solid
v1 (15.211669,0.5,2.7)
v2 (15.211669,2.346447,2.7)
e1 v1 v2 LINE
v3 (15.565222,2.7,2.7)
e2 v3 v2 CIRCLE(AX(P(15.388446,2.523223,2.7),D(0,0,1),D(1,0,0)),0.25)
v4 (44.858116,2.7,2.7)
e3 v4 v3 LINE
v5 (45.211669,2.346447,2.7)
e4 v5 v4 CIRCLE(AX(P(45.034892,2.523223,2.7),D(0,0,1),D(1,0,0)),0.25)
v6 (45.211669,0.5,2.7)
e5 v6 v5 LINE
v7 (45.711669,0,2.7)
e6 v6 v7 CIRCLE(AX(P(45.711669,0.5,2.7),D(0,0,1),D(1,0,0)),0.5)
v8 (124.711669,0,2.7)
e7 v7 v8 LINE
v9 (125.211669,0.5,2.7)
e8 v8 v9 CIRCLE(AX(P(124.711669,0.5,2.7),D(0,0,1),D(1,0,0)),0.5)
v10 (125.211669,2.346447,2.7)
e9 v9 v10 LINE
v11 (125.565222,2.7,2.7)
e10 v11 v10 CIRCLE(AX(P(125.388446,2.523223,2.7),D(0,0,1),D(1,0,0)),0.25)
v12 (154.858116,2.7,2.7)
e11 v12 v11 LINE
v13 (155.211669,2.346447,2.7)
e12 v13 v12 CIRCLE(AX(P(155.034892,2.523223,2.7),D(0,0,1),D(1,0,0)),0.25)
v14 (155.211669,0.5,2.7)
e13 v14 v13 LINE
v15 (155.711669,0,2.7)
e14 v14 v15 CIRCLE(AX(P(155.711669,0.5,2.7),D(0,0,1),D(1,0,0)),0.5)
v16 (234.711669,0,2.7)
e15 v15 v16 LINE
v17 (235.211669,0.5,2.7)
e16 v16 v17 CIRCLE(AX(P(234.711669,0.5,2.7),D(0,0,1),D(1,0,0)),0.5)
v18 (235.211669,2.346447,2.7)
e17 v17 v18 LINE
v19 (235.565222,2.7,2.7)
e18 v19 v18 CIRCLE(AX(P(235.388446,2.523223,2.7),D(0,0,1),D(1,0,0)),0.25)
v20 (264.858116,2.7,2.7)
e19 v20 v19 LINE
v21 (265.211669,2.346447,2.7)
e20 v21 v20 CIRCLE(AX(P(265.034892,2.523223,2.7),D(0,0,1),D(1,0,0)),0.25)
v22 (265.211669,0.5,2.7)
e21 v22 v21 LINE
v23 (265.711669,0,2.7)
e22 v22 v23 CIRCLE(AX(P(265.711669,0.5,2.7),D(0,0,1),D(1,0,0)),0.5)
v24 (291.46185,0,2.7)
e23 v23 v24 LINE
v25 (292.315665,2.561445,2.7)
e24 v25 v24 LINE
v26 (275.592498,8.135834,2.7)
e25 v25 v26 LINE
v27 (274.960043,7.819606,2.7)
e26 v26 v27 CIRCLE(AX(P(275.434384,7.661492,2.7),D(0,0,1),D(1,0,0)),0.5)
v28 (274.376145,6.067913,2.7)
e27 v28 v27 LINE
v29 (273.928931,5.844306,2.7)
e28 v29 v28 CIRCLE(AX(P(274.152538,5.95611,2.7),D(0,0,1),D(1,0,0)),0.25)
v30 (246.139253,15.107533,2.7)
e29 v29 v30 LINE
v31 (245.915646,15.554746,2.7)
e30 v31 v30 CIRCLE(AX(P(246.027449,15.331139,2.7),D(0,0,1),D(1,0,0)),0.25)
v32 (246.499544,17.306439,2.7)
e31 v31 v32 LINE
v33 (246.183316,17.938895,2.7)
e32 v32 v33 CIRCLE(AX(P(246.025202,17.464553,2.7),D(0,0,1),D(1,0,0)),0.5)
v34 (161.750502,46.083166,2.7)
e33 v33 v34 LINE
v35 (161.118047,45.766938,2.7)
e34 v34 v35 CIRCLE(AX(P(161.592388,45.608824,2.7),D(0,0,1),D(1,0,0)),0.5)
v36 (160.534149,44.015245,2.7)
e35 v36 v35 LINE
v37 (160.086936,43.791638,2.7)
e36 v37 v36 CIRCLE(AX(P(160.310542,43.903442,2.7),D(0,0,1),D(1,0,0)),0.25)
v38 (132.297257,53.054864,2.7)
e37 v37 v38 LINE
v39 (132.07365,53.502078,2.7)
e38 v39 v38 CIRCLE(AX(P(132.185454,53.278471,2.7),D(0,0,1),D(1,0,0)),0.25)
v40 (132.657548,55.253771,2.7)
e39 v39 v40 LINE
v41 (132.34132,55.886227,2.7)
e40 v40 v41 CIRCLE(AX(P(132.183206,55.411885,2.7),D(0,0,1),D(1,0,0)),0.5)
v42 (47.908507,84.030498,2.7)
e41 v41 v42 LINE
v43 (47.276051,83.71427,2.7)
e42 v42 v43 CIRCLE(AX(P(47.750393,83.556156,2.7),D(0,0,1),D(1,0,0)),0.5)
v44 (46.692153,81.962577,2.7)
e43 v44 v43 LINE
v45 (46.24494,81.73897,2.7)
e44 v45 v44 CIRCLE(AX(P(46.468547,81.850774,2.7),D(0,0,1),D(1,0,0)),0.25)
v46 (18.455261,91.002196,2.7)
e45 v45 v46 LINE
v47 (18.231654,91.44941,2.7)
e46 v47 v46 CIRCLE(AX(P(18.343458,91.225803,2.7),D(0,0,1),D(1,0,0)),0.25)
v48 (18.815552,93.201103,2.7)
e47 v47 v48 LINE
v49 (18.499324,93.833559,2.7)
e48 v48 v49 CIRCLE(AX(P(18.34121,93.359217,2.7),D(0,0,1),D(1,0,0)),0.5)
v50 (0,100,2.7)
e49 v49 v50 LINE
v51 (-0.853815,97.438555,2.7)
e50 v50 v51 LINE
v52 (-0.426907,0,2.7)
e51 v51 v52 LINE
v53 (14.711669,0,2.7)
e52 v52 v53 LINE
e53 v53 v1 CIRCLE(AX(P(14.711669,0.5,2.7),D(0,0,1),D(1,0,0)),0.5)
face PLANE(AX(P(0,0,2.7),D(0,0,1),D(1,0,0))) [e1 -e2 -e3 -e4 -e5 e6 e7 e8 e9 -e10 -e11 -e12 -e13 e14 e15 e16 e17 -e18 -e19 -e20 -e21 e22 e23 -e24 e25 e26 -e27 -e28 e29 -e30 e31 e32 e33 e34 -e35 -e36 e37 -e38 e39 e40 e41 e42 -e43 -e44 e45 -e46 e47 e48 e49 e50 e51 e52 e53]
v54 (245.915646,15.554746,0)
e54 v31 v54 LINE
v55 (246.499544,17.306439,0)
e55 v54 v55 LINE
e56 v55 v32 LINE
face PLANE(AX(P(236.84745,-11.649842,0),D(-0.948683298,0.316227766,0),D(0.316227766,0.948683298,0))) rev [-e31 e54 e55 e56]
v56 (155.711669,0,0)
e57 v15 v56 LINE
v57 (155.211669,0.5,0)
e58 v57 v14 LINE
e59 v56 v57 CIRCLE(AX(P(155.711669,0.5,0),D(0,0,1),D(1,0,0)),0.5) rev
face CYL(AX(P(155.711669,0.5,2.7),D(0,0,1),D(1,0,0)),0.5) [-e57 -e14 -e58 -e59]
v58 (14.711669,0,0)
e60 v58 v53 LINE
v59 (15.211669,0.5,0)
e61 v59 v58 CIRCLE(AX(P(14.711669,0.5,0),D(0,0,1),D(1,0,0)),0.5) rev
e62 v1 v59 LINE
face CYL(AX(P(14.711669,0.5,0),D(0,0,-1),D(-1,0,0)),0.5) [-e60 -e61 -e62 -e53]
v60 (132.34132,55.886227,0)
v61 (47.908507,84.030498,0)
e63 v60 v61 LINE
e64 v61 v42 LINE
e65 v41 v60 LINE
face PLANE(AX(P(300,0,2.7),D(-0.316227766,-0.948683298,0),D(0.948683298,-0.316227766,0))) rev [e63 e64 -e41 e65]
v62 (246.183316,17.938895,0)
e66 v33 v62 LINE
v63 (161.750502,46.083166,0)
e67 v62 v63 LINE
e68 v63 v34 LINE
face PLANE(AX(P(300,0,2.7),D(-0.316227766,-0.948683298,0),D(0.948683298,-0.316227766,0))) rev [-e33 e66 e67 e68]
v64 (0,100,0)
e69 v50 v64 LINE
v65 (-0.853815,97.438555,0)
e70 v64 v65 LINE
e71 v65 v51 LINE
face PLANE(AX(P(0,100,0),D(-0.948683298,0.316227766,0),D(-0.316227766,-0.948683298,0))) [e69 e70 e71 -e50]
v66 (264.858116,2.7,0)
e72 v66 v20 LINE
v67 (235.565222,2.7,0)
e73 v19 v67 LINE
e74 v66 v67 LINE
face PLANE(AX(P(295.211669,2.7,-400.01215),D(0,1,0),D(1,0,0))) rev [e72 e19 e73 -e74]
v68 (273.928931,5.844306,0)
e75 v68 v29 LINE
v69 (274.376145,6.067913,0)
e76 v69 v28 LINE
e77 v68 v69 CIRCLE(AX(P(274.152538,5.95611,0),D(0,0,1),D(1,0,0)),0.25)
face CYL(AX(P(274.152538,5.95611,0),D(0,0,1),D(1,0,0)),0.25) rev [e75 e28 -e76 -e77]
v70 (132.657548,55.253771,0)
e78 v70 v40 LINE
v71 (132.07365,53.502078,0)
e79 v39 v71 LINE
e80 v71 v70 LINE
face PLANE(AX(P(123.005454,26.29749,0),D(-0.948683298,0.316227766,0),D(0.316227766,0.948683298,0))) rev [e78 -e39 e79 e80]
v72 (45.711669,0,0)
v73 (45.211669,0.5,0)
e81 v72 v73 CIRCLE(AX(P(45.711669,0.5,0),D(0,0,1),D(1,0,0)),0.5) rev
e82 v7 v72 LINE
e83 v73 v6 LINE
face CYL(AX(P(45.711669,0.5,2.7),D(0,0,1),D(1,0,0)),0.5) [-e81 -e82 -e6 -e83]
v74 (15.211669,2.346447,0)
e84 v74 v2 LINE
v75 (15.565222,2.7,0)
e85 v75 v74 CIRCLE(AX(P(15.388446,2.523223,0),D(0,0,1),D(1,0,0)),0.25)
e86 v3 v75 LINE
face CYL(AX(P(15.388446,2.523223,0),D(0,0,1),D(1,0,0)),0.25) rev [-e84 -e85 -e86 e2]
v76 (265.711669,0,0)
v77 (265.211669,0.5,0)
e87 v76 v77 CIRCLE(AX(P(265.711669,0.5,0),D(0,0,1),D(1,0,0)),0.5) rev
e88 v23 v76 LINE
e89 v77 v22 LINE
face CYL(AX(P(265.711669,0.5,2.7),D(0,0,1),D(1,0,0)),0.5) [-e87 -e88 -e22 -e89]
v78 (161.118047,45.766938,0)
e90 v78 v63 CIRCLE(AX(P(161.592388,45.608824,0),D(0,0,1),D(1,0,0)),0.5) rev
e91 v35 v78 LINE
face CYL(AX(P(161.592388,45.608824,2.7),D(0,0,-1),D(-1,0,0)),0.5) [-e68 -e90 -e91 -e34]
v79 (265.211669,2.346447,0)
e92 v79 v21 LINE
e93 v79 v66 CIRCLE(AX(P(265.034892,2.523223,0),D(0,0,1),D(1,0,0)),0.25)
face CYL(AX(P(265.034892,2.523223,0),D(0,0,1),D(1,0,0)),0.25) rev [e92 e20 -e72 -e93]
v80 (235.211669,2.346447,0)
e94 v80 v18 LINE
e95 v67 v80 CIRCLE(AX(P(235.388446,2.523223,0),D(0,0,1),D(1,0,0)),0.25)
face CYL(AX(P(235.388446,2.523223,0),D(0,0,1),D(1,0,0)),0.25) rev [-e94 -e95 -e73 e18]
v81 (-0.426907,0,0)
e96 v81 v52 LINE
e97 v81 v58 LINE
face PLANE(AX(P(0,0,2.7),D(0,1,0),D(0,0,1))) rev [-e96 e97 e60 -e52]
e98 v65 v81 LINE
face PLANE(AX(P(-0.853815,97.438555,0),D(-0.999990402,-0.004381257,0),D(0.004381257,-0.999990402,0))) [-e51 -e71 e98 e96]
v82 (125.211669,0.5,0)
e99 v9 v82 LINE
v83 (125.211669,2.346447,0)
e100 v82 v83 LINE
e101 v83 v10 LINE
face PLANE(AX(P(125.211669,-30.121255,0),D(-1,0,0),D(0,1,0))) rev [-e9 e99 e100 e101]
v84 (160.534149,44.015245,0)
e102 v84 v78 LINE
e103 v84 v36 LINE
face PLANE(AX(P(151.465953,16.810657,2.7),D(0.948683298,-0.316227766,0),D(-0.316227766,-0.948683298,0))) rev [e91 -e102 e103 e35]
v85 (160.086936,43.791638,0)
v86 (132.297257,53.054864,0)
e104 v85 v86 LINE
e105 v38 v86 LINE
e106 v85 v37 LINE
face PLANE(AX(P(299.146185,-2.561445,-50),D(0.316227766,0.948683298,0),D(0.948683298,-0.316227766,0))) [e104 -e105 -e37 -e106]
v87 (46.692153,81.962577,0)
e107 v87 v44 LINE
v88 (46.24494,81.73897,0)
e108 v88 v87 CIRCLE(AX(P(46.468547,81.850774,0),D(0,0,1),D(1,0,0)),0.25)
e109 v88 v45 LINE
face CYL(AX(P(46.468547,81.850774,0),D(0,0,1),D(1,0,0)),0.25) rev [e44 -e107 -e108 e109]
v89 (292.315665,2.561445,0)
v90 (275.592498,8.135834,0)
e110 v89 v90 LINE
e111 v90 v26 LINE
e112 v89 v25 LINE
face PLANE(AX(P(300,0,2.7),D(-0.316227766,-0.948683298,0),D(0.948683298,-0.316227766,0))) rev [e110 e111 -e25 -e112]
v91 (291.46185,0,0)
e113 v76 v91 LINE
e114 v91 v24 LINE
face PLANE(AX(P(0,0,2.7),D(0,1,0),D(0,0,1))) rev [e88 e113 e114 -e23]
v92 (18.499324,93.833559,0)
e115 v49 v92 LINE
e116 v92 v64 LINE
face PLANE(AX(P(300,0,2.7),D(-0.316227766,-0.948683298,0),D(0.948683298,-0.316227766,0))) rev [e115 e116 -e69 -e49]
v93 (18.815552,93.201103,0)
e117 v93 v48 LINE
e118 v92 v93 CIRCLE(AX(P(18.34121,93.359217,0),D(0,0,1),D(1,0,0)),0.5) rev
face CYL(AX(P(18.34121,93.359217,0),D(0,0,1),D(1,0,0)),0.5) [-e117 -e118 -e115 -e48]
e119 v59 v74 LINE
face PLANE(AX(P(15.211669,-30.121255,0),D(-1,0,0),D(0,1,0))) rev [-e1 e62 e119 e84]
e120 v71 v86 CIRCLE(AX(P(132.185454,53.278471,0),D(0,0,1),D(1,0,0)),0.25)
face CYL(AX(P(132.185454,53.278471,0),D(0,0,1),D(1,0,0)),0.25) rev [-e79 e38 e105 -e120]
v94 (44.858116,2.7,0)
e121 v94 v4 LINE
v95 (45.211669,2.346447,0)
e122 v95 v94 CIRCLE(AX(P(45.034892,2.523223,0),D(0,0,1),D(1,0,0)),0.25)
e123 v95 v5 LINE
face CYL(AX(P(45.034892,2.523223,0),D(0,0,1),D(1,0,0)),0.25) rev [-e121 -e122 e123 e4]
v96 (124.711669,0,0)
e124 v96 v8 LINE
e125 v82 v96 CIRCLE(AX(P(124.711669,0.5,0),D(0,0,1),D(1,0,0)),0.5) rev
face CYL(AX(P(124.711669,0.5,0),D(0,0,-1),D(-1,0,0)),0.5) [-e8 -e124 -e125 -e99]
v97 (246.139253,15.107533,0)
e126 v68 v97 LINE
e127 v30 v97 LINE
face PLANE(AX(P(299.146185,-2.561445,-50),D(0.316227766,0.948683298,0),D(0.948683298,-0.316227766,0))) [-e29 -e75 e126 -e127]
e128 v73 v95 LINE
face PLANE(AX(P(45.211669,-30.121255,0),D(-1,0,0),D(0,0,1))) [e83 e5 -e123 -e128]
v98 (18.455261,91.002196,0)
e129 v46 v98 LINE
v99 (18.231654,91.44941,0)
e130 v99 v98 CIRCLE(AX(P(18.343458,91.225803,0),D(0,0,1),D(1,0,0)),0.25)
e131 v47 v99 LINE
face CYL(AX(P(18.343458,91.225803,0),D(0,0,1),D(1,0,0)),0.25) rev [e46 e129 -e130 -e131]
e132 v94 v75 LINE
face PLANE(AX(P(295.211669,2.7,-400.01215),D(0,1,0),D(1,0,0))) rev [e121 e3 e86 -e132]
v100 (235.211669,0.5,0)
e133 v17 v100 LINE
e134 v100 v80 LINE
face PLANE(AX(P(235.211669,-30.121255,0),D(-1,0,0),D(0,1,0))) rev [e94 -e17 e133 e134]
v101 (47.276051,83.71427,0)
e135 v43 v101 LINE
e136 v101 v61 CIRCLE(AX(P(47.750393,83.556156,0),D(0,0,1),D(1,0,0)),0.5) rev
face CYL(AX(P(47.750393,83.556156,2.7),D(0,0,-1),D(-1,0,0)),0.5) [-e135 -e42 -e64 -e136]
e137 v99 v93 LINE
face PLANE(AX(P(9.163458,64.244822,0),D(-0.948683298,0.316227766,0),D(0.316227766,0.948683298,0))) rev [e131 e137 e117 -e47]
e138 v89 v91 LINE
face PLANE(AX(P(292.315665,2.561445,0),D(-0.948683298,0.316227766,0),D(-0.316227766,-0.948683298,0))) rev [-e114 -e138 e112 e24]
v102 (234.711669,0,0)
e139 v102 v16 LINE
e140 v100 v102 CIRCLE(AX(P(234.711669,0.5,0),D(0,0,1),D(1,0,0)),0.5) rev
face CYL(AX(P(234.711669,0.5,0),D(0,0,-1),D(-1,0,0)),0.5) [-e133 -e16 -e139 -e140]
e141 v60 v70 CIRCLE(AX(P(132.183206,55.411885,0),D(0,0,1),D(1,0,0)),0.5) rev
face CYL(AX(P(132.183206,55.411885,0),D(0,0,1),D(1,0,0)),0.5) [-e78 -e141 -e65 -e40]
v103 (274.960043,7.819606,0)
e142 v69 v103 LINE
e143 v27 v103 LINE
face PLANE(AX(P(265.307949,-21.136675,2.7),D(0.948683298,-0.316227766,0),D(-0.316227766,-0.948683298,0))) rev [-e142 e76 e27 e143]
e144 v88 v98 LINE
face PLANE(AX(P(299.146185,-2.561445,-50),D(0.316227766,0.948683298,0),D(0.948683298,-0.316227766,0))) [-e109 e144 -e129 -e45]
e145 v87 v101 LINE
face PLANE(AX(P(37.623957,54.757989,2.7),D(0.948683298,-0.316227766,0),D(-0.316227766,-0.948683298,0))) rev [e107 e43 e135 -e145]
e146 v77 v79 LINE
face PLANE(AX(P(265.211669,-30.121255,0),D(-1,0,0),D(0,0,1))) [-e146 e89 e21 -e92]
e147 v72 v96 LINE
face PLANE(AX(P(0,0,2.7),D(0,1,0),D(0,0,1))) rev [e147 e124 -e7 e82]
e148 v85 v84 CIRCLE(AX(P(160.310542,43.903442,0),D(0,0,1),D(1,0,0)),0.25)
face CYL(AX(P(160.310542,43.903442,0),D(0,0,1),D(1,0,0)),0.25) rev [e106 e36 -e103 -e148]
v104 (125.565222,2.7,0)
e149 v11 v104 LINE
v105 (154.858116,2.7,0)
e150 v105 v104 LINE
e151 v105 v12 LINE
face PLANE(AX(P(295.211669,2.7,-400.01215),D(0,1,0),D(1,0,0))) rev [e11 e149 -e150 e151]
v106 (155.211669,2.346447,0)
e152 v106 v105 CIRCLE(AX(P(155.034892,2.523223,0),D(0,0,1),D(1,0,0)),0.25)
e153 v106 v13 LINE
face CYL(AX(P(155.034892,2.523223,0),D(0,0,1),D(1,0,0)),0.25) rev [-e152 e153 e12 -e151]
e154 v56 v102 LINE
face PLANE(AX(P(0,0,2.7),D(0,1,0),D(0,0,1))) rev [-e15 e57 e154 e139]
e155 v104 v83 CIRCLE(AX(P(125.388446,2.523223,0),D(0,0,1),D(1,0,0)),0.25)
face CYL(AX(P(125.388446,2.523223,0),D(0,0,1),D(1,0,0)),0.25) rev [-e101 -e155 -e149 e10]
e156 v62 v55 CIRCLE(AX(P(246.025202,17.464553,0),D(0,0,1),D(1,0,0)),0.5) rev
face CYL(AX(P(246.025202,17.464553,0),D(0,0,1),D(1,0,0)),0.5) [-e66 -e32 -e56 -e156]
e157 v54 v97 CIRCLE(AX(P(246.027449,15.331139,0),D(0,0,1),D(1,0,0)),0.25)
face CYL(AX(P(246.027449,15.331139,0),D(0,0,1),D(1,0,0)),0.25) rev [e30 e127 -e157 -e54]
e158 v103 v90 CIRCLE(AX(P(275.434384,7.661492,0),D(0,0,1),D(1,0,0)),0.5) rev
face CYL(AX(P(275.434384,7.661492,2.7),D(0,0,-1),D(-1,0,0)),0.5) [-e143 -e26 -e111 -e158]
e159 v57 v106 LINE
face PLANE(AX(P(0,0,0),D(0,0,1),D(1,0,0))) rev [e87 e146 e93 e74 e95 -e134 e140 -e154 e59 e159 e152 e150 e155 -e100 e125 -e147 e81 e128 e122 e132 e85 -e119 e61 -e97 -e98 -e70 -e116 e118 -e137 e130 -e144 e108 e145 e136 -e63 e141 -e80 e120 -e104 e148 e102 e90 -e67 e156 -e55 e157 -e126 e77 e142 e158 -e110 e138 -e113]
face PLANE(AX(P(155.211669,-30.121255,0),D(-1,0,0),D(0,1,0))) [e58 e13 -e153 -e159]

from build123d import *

# Parameters (mm, degrees)
BOSS_EXTRUDE1_DEPTH = 2.7
CAVITY1_OUTLINE_W   = 30
CAVITY1_OUTLINE_H   = 2.7
CAVITY1_DEPTH       = 2.7
CAVITY2_START       = -11.622776602
CAVITY2_OUTLINE_W   = 1.798654648
CAVITY2_OUTLINE_H   = 2.7
CAVITY2_DEPTH       = 30
CAVITY2_START_2     = 108.377223398
CAVITY2_2_OUTLINE_W = 1.798654648
CAVITY2_2_OUTLINE_H = 2.7
CAVITY2_2_DEPTH     = 30
CAVITY2_START_3     = 228.377223398
CAVITY2_3_OUTLINE_W = 1.798654648
CAVITY2_3_OUTLINE_H = 2.7
CAVITY2_3_DEPTH     = 30
CUT_EXTRUDE1_DEPTH  = 317.239292309
BOSS_EXTRUDE3_DEPTH = 2.7
SKETCH7_R           = 0.25
CUT_EXTRUDE2_DEPTH  = 2.7
FILLET2_R           = 0.5


# Read off the part's stored shape, not the designer's step: Cavity1, Cavity2
with BuildPart() as part:
    # Sketch1 → Boss-Extrude1 (new body)
    with BuildSketch(Plane.XY):
        Polygon((0, 0), (300, 0), (0, 100), align=None)
    extrude(amount=BOSS_EXTRUDE1_DEPTH)

    # Cavity1 outline → Cavity1 (cut)
    with BuildSketch(Plane.XY):
        with Locations((30.21166892, 1.35)):
            Rectangle(CAVITY1_OUTLINE_W, CAVITY1_OUTLINE_H)
        Polygon((47.149134475, 83.333520418), (47.434164903, 84.188611699), (18.973665961, 93.67544468), (18.688635534, 92.820353398), align=None)
        Polygon((160.991130241, 45.386188495), (161.276160669, 46.241279777), (132.815661727, 55.728112758), (132.5306313, 54.873021476), align=None)
        Polygon((274.833126007, 7.438856573), (275.118156435, 8.293947855), (246.657657493, 17.780780836), (246.372627066, 16.925689554), align=None)
        with Locations((250.21166892, 1.35)):
            Rectangle(CAVITY1_OUTLINE_W, CAVITY1_OUTLINE_H)
        with Locations((140.21166892, 1.35)):
            Rectangle(CAVITY1_OUTLINE_W, CAVITY1_OUTLINE_H)
    extrude(amount=CAVITY1_DEPTH, mode=Mode.SUBTRACT)

    # Cavity2 outline → Cavity2 (cut)
    with BuildSketch(Plane(origin=(0, 0, 0), x_dir=(0.316227766016832, 0.9486832980505158, 0), z_dir=(0.9486832980505159, -0.316227766016832, 0)).offset(CAVITY2_START)):
        with Locations((93.067657129, 1.35)):
            Rectangle(CAVITY2_OUTLINE_W, CAVITY2_OUTLINE_H)
    extrude(amount=CAVITY2_DEPTH, mode=Mode.SUBTRACT)

    # Cavity2 2 outline → Cavity2 2 (cut)
    with BuildSketch(Plane(origin=(0, 0, 0), x_dir=(0.316227766016832, 0.9486832980505158, 0), z_dir=(0.9486832980505159, -0.316227766016832, 0)).offset(CAVITY2_START_2)):
        with Locations((93.067657129, 1.35)):
            Rectangle(CAVITY2_2_OUTLINE_W, CAVITY2_2_OUTLINE_H)
    extrude(amount=CAVITY2_2_DEPTH, mode=Mode.SUBTRACT)

    # Cavity2 3 outline → Cavity2 3 (cut)
    with BuildSketch(Plane(origin=(0, 0, 0), x_dir=(0.316227766016832, 0.9486832980505158, 0), z_dir=(0.9486832980505159, -0.316227766016832, 0)).offset(CAVITY2_START_3)):
        with Locations((93.067657129, 1.35)):
            Rectangle(CAVITY2_3_OUTLINE_W, CAVITY2_3_OUTLINE_H)
    extrude(amount=CAVITY2_3_DEPTH, mode=Mode.SUBTRACT)

    # Sketch4 → Cut-Extrude1 (cut, through all)
    with BuildSketch(Plane.XY.offset(2.7)):
        Polygon((292.315665286, 2.561444905), (291.461850318, 0), (300, 0), align=None)
    extrude(amount=-CUT_EXTRUDE1_DEPTH, mode=Mode.SUBTRACT)

    # Sketch5 → Boss-Extrude3 (add)
    with BuildSketch(Plane.XY.offset(2.7)):
        Polygon((0, 100), (-0.853814968, 97.438555095), (-0.426907484, 0), (0, 0), align=None)
    extrude(amount=-BOSS_EXTRUDE3_DEPTH)

    # Sketch7 → Cut-Extrude2 (cut)
    with BuildSketch(Plane.XY.offset(2.7)):
        with Locations((18.343457791, 91.225803174)):
            Circle(SKETCH7_R)
        with Locations((132.185453557, 53.278471252)):
            Circle(SKETCH7_R)
        with Locations((46.468546535, 81.850773592)):
            Circle(SKETCH7_R)
        with Locations((160.310542301, 43.90344167)):
            Circle(SKETCH7_R)
        with Locations((246.027449323, 15.33113933)):
            Circle(SKETCH7_R)
        with Locations((274.152538068, 5.956109748)):
            Circle(SKETCH7_R)
        with Locations((265.034892224, 2.523223305)):
            Circle(SKETCH7_R)
        with Locations((235.388445615, 2.523223305)):
            Circle(SKETCH7_R)
        with Locations((155.034892224, 2.523223305)):
            Circle(SKETCH7_R)
        with Locations((125.388445615, 2.523223305)):
            Circle(SKETCH7_R)
        with Locations((45.034892224, 2.523223305)):
            Circle(SKETCH7_R)
        with Locations((15.388445615, 2.523223305)):
            Circle(SKETCH7_R)
    extrude(amount=-CUT_EXTRUDE2_DEPTH, mode=Mode.SUBTRACT)

    # Fillet2
    fillet2_edges = [part.edges().sort_by_distance(p)[0] for p in [
        (18.973665961, 93.67544468, 1.35),
        (47.434164903, 84.188611699, 1.35),
        (132.815661727, 55.728112758, 1.35),
        (161.276160669, 46.241279777, 1.35),
        (246.657657493, 17.780780836, 1.35),
        (275.118156435, 8.293947855, 1.35),
        (235.21166892, 0, 1.35),
        (125.21166892, 0, 1.35),
        (15.21166892, 0, 1.35),
        (265.21166892, 0, 1.35),
        (155.21166892, 0, 1.35),
        (45.21166892, 0, 1.35),
    ]]
    fillet(fillet2_edges, radius=FILLET2_R)


solid = part.part
